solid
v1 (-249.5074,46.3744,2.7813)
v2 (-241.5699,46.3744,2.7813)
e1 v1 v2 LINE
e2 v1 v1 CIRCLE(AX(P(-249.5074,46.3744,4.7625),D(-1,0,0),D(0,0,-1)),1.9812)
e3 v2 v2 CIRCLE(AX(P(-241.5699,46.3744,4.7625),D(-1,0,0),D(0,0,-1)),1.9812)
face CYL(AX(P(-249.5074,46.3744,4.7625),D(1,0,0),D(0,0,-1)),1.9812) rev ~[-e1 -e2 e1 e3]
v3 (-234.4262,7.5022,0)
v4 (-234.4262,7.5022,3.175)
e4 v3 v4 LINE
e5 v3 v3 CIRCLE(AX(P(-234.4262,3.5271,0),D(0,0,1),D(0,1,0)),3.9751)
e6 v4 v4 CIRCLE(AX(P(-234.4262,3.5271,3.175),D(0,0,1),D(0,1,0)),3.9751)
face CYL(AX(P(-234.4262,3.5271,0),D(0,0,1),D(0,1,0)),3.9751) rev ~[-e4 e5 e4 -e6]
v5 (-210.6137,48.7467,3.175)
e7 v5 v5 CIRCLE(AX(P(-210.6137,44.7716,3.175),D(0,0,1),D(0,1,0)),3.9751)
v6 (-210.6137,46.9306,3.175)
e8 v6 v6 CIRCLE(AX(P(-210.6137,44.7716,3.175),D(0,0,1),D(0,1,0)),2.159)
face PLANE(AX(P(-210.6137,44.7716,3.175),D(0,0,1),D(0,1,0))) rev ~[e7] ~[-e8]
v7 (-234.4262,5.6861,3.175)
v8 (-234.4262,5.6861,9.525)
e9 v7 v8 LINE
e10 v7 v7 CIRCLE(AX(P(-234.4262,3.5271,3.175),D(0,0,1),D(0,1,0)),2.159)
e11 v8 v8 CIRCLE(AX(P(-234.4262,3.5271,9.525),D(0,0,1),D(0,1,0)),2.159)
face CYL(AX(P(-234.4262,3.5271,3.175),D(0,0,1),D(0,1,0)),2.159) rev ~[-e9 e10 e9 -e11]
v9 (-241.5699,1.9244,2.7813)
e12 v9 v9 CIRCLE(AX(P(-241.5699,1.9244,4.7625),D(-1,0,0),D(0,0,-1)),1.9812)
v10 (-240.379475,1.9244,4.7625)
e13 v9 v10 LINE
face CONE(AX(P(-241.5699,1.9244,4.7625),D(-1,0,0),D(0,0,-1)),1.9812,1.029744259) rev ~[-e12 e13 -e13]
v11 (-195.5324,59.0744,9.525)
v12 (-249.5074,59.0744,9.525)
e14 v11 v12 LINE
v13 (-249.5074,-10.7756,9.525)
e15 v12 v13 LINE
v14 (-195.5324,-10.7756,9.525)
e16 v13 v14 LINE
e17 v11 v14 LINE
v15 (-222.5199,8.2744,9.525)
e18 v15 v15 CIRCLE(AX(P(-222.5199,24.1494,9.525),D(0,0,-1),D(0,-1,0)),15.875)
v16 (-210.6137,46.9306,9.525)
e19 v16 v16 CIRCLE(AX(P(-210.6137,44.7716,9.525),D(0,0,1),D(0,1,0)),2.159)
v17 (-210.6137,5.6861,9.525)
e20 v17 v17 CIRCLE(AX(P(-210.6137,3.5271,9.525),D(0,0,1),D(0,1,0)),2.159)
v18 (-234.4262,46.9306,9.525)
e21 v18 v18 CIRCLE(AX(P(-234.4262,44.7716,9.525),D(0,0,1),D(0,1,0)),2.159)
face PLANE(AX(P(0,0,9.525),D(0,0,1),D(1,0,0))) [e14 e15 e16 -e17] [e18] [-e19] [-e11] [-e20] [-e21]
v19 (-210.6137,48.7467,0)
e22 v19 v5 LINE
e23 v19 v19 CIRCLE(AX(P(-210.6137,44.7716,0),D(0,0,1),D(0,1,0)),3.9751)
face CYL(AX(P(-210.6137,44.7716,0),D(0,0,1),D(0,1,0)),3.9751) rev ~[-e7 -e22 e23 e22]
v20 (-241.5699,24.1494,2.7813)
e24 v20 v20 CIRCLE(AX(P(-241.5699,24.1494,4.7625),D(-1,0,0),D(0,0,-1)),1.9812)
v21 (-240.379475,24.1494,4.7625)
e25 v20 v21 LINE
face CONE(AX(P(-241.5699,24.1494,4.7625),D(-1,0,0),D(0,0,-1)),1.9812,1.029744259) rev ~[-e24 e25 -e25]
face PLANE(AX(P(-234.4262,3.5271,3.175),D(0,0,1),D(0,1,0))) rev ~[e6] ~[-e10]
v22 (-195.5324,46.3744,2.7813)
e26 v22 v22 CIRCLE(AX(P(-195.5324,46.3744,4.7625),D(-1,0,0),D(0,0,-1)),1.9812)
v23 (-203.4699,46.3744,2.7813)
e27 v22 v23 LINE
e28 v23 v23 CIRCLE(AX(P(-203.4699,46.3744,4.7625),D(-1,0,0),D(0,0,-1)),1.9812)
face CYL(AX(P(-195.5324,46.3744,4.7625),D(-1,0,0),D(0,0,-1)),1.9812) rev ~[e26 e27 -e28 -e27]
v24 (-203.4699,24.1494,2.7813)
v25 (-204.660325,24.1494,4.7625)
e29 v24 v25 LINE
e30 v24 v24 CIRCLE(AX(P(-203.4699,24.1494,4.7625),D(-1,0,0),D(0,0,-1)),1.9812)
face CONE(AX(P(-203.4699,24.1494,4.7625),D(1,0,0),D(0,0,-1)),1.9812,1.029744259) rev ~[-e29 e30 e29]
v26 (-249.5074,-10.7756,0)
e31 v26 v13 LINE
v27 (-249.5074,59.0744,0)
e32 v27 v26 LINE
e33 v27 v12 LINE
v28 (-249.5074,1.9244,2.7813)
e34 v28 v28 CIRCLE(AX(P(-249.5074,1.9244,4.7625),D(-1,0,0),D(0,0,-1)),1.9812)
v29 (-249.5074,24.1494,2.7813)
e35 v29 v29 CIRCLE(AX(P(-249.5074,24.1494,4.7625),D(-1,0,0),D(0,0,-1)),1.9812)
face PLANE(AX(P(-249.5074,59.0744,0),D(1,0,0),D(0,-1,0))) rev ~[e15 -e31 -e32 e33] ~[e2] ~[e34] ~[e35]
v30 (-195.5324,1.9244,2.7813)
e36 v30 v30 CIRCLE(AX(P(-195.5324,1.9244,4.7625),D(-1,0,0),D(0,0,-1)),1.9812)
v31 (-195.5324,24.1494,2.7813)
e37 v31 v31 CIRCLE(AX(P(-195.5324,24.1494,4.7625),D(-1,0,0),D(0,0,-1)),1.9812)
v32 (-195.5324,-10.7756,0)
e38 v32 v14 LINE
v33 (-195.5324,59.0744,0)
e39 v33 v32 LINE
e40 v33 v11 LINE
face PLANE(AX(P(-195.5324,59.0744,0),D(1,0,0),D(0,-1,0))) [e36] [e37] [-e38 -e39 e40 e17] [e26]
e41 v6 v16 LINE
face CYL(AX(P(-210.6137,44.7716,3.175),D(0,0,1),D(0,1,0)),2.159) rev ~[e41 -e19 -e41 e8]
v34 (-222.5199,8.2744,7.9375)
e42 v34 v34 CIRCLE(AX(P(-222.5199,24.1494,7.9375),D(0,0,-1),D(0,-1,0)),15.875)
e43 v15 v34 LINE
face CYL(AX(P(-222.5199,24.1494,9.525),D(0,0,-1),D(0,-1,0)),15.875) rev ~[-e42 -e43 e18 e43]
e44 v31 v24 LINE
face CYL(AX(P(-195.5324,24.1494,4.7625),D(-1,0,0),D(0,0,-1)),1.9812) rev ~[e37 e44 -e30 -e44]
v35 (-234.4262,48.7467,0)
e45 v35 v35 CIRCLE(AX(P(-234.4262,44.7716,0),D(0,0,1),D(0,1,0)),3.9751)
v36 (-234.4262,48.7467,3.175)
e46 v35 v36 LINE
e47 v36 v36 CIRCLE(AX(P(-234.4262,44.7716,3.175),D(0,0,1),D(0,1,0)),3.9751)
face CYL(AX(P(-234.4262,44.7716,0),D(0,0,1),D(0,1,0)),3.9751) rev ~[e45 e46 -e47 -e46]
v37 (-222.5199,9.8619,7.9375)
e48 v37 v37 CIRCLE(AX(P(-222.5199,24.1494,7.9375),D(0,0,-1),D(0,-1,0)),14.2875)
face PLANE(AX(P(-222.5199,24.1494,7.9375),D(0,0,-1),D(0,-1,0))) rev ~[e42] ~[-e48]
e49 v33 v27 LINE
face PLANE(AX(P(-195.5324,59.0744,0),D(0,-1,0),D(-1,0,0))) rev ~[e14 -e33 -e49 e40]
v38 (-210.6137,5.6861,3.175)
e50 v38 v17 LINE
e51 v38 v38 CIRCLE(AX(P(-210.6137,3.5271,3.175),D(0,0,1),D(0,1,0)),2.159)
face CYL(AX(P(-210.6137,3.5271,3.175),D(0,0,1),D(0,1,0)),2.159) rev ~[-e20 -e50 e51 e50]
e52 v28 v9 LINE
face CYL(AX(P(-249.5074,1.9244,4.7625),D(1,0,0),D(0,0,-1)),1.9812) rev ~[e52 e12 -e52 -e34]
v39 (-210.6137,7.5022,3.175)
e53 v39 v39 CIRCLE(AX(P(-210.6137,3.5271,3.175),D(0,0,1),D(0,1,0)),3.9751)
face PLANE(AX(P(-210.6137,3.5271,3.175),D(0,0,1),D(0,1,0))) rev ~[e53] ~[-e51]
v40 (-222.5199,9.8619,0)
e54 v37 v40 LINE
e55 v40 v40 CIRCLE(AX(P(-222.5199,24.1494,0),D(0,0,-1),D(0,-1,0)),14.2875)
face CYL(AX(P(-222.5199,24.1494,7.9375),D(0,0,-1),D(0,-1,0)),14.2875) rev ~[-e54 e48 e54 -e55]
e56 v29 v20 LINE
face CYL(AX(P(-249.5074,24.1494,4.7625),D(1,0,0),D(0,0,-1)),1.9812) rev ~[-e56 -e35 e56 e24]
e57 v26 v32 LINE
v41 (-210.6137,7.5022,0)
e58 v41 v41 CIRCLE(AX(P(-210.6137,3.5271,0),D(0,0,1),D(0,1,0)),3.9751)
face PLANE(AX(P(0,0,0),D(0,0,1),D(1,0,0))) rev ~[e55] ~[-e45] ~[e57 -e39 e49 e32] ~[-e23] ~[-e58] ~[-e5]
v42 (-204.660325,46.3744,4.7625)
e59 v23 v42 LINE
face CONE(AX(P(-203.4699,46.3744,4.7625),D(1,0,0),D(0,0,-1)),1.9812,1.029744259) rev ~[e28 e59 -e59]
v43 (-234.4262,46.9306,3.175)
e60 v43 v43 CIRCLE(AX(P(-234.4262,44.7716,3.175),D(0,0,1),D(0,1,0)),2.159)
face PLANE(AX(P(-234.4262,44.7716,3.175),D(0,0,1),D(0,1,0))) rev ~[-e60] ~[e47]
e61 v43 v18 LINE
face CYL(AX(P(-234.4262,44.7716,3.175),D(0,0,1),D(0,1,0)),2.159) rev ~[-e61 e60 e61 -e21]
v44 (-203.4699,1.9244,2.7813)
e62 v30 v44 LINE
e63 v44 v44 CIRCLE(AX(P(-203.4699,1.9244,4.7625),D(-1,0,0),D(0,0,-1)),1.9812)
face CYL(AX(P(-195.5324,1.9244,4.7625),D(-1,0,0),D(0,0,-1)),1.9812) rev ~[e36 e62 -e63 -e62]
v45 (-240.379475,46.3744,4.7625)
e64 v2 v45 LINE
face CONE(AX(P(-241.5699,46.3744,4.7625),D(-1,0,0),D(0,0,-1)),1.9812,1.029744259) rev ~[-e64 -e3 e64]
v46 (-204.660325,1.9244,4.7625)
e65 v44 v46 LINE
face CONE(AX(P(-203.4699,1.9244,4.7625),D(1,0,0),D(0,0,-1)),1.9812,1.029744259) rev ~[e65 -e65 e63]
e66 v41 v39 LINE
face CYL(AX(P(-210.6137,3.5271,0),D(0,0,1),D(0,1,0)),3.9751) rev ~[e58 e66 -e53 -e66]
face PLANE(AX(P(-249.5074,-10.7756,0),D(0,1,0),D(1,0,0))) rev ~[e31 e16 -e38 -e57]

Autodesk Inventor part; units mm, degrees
ref_plane "YZ Plane" through (0, 0, 0) normal (1, 0, 0) x (0, 1, 0)
ref_plane "XZ Plane" through (0, 0, 0) normal (0, 1, 0) x (-1, 0, 0)
sketch "Sketch1" plane through (0, 0, 0) normal (0, 0, 1) x (1, 0, 0)
  circle A0 centre (0, 0) radius 38.1 construction
  circle A1 centre (0, 0) radius 41.275 construction
  line L0 (-7.3323, 0) -> (-3.6662, 6.35) construction
  line L1 (-3.6662, 6.35) -> (3.6662, 6.35) construction
  line L2 (3.6662, 6.35) -> (7.3323, 0) construction
  line L3 (7.3323, 0) -> (3.6662, -6.35) construction
  line L4 (3.6662, -6.35) -> (-3.6662, -6.35) construction
  line L5 (-3.6662, -6.35) -> (-7.3323, 0) construction
  circle A2 centre (0, 0) radius 14.2875 construction
  circle A3 centre (0, 0) radius 15.875 construction
  circle A4 centre (0, 0) radius 8.7313 construction
  circle A5 centre (0, 0) radius 22.225 construction
  line L6 (34.925, 38.1) -> (34.925, 95.25) construction
  line L7 (34.925, 95.25) -> (-34.925, 95.25) construction
  line L8 (-34.925, 95.25) -> (-34.925, 38.1) construction
  line L9 (34.925, 38.1) -> (-34.925, 38.1) construction
  line L10 (34.925, 38.1) -> (21.2491, -6.5137) construction
  line L11 (-34.925, 38.1) -> (-21.2491, -6.5137) construction
  circle A6 centre (-30.353, 38.1) radius 3.9624 construction
  line L12 (53.34, 95.25) -> (-53.34, 95.25) construction
  line L13 (-53.34, 95.25) -> (-53.34, 104.775) construction
  line L14 (-53.34, 104.775) -> (53.34, 104.775) construction
  line L15 (53.34, 104.775) -> (53.34, 95.25) construction
  circle A7 centre (-222.5199, 24.1494) radius 53.34 construction
  line L16 (-190.7699, 59.0744) -> (-254.2699, 59.0744)
  line L17 (-254.2699, 59.0744) -> (-254.2699, -10.7756)
  line L18 (-254.2699, -10.7756) -> (-190.7699, -10.7756)
  line L19 (-190.7699, -10.7756) -> (-190.7699, 59.0744)
  line L20 (-195.5324, 59.0744) -> (-195.5324, -10.7756)
  line L21 (-249.5074, 59.0744) -> (-249.5074, -10.7756)
  line L22 (-209.8199, 68.5994) -> (-235.2199, 68.5994) construction
  line L23 (-235.2199, 68.5994) -> (-235.2199, -20.3006) construction
  line L24 (-235.2199, -20.3006) -> (-209.8199, -20.3006) construction
  line L25 (-209.8199, -20.3006) -> (-209.8199, 68.5994) construction
  line L26 (34.925, 88.9) -> (-34.925, 88.9) construction
  circle A8 centre (30.353, 38.1) radius 3.9624 construction
  circle A9 centre (30.353, 76.2) radius 3.9624 construction
  circle A10 centre (-30.353, 76.2) radius 3.9624 construction
  circle A11 centre (0, 47.625) radius 3.9624 construction
  line L27 (34.925, 92.075) -> (-34.925, 92.075) construction
  circle A12 centre (0, 71.755) radius 14.2875 construction
  circle A13 centre (0, 71.755) radius 15.875 construction
  line L28 (7.3323, 71.755) -> (3.6662, 65.405) construction
  line L29 (3.6662, 65.405) -> (-3.6662, 65.405) construction
  line L30 (-3.6662, 65.405) -> (-7.3323, 71.755) construction
  line L31 (-7.3323, 71.755) -> (-3.6662, 78.105) construction
  line L32 (-3.6662, 78.105) -> (3.6662, 78.105) construction
  line L33 (3.6662, 78.105) -> (7.3323, 71.755) construction
  point P0 (22.225, 92.075)
  point P1 (0, 92.075)
  point P2 (-22.225, 92.075)
  point P3 (0, 47.625)
  dimension "d0" = 76.2
  dimension "d2" = 82.55
  dimension "d3" = 12.7
  dimension "d4" = 28.575
  dimension "d5" = 31.75
  dimension "d6" = 17.4625
  dimension "d7" = 44.45
  dimension "d8" = 69.85
  dimension "d9" = 34.925
  dimension "d10" = 38.1
  dimension "d11" = 57.15
  dimension "d13" = 7.9248
  dimension "d14" = 9.525
  dimension "d15" = 106.68
  dimension "d16" = 53.34
  dimension "d17" = 106.68
  dimension "d18" = 69.85
  dimension "d19" = 34.925
  dimension "d20" = 63.5
  dimension "d21" = 31.75
  dimension "d22" = 4.7625
  dimension "d23" = 4.7625
  dimension "d24" = 25.4
  dimension "d25" = 14.2875
  dimension "d26" = 88.9
  dimension "d27" = 14.2875
  dimension "d28" = 44.45
  dimension "d29" = 4.572
  dimension "d30" = 6.35
  dimension "d31" = 0
  dimension "d32" = 7.9248
  dimension "d33" = 4.572
  dimension "d34" = 7.9248
  dimension "d35" = 7.9248
  dimension "d36" = 4.572
  dimension "d37" = 4.572
  dimension "d38" = 38.1
  dimension "d39" = 38.1
  dimension "d40" = 7.9248
  dimension "d41" = 9.525
  dimension "d42" = 34.925
  dimension "d44" = 3.175
  dimension "d45" = 34.925
  dimension "d46" = 12.7
  dimension "d47" = 12.7
  dimension "d48" = 28.575
  dimension "d50" = 0
  dimension "d52" = 31.75
  dimension "d53" = 12.7
  dimension "d54" = 17.145
extrude "Plate1" add sketch "Sketch1" along normal blind 9.525 contours L20 L18 L21 L16
sketch "Sketch3" plane through (0, 0, 0) normal (0, 0, -1) x (-1, 0, 0)
  line L0 (249.5074, -10.7756) -> (195.5324, -10.7756) projected
  line L1 (249.5074, 59.0744) -> (249.5074, -10.7756) projected
  circle A0 centre (222.5199, 24.1494) radius 23.8125 construction
  line L2 (210.6137, 44.7716) -> (222.5199, 24.1494) construction
  line L3 (222.5199, 24.1494) -> (198.7074, 24.1494) construction
  point P0 (195.5324, 59.0744)
  point P1 (0, 0)
  point P2 (198.7074, 24.1494)
  point P3 (210.6137, 3.5271)
  point P4 (234.4262, 3.5271)
  point P5 (246.3324, 24.1494)
  point P6 (234.4262, 44.7716)
  dimension "d69" = 47.625
  dimension "d71" = 26.9875
  dimension "d72" = 53.975
  dimension "d73" = 34.925
  dimension "d74" = 69.85
  dimension "d75" = 60
  dimension "d78" = 360
hole "Hole2" at (-210.6137, 44.7716, 0) at (-210.6137, 3.5271, 0) at (-234.4262, 3.5271, 0) at (-234.4262, 44.7716, 0) direction (0, 0, 1) diameter 4.318 end through all counterbore diameter 7.9502 counterbore depth 3.175 clearance for "Socket Head Cap Screw" size "#8" standard "Ansi Unified Screw Threads"
sketch "Sketch4" plane through (0, 0, 9.525) normal (0, 0, 1) x (1, 0, 0)
  line L0 (-249.5074, -10.7756) -> (-249.5074, 59.0744) projected
  line L1 (-195.5324, -10.7756) -> (-249.5074, -10.7756) projected
  point P0 (0, 0)
  point P1 (-222.5199, 24.1494)
  dimension "d97" = 53.975
  dimension "d98" = 69.85
  dimension "d99" = 34.925
  dimension "d100" = 26.9875
hole "Hole4" at (-222.5199, 24.1494, 9.525) direction (0, 0, -1) diameter 28.575 end through all counterbore diameter 31.75 counterbore depth 1.5875
ref_plane "Work Plane1" through (-222.5199, -10.7756, 0) normal (1, 0, 0) x (0, 0, -1)
sketch "Sketch2" plane through (-195.5324, -10.7756, 0) normal (1, 0, 0) x (0, 0, -1)
  line L0 (0, 0) -> (-9.525, 0) projected
  line L1 (0, 69.85) -> (-9.525, 69.85) projected
  line L2 (-4.7625, 69.85) -> (-4.7625, 0) construction
  point P0 (0, 10.7756)
  point P1 (-4.7625, 57.15)
  point P2 (-4.7625, 34.925)
  point P3 (-4.7625, 12.7)
  dimension "d87" = 12.7
  dimension "d88" = 12.7
  dimension "d89" = 34.925
hole "Hole1" at (-195.5324, 46.3744, 4.7625) at (-195.5324, 24.1494, 4.7625) at (-195.5324, 1.9244, 4.7625) direction (-1, 0, 0) diameter 3.9624 depth 7.9375 tip angle 118 thread size "10-32 UNF" class "2B" standard "ANSI Unified Screw Threads"
mirror "Mirror1" about plane through (-222.5199, -10.7756, 0) normal (1, 0, 0) of "Hole1"
equation "\"d99\" = 0.5 * d98"
equation "\"d100\" = 0.5 * d97"
equation "\"d9\" = 0.5 * d8"
equation "\"d16\" = 0.5 * d15"
equation "\"d19\" = 0.5 * d18"
equation "\"d21\" = 0.5 * d20"
equation "\"d22\" = d23"
equation "\"d25\" = d27"
equation "\"d28\" = 0.5 * d26"
equation "\"d32\" = d13"
equation "\"d33\" = d29"
equation "\"d34\" = d32"
equation "\"d35\" = d13"
equation "\"d36\" = d29"
equation "\"d37\" = d29"
equation "\"d39\" = d38"
equation "\"d40\" = d13"
equation "\"d44\" = 0.5 * d30"
equation "\"d71\" = 0.5 * d72"
equation "\"d73\" = 0.5 * d74"
equation "\"d106\" = Thickness"
equation "\"d45\" = d42"
equation "\"d47\" = d46"
equation "\"BendRadius\" = Thickness"
equation "\"BendReliefWidth\" = Thickness"
equation "\"BendReliefDepth\" = 0.5 * Thickness"
equation "\"CornerReliefSize\" = 4 * Thickness"
equation "\"MinimumRemnant\" = 2 * Thickness"
equation "\"TransitionRadius\" = BendRadius"
equation "\"JacobiRadiusSize\" = Thickness"
equation "\"GapSize\" = Thickness"
equation "\"d55\" = BendRadius"
equation "\"Thickness\" = 9.525"
properties part number "Swerve Wheel + Carriage Outline V1"
